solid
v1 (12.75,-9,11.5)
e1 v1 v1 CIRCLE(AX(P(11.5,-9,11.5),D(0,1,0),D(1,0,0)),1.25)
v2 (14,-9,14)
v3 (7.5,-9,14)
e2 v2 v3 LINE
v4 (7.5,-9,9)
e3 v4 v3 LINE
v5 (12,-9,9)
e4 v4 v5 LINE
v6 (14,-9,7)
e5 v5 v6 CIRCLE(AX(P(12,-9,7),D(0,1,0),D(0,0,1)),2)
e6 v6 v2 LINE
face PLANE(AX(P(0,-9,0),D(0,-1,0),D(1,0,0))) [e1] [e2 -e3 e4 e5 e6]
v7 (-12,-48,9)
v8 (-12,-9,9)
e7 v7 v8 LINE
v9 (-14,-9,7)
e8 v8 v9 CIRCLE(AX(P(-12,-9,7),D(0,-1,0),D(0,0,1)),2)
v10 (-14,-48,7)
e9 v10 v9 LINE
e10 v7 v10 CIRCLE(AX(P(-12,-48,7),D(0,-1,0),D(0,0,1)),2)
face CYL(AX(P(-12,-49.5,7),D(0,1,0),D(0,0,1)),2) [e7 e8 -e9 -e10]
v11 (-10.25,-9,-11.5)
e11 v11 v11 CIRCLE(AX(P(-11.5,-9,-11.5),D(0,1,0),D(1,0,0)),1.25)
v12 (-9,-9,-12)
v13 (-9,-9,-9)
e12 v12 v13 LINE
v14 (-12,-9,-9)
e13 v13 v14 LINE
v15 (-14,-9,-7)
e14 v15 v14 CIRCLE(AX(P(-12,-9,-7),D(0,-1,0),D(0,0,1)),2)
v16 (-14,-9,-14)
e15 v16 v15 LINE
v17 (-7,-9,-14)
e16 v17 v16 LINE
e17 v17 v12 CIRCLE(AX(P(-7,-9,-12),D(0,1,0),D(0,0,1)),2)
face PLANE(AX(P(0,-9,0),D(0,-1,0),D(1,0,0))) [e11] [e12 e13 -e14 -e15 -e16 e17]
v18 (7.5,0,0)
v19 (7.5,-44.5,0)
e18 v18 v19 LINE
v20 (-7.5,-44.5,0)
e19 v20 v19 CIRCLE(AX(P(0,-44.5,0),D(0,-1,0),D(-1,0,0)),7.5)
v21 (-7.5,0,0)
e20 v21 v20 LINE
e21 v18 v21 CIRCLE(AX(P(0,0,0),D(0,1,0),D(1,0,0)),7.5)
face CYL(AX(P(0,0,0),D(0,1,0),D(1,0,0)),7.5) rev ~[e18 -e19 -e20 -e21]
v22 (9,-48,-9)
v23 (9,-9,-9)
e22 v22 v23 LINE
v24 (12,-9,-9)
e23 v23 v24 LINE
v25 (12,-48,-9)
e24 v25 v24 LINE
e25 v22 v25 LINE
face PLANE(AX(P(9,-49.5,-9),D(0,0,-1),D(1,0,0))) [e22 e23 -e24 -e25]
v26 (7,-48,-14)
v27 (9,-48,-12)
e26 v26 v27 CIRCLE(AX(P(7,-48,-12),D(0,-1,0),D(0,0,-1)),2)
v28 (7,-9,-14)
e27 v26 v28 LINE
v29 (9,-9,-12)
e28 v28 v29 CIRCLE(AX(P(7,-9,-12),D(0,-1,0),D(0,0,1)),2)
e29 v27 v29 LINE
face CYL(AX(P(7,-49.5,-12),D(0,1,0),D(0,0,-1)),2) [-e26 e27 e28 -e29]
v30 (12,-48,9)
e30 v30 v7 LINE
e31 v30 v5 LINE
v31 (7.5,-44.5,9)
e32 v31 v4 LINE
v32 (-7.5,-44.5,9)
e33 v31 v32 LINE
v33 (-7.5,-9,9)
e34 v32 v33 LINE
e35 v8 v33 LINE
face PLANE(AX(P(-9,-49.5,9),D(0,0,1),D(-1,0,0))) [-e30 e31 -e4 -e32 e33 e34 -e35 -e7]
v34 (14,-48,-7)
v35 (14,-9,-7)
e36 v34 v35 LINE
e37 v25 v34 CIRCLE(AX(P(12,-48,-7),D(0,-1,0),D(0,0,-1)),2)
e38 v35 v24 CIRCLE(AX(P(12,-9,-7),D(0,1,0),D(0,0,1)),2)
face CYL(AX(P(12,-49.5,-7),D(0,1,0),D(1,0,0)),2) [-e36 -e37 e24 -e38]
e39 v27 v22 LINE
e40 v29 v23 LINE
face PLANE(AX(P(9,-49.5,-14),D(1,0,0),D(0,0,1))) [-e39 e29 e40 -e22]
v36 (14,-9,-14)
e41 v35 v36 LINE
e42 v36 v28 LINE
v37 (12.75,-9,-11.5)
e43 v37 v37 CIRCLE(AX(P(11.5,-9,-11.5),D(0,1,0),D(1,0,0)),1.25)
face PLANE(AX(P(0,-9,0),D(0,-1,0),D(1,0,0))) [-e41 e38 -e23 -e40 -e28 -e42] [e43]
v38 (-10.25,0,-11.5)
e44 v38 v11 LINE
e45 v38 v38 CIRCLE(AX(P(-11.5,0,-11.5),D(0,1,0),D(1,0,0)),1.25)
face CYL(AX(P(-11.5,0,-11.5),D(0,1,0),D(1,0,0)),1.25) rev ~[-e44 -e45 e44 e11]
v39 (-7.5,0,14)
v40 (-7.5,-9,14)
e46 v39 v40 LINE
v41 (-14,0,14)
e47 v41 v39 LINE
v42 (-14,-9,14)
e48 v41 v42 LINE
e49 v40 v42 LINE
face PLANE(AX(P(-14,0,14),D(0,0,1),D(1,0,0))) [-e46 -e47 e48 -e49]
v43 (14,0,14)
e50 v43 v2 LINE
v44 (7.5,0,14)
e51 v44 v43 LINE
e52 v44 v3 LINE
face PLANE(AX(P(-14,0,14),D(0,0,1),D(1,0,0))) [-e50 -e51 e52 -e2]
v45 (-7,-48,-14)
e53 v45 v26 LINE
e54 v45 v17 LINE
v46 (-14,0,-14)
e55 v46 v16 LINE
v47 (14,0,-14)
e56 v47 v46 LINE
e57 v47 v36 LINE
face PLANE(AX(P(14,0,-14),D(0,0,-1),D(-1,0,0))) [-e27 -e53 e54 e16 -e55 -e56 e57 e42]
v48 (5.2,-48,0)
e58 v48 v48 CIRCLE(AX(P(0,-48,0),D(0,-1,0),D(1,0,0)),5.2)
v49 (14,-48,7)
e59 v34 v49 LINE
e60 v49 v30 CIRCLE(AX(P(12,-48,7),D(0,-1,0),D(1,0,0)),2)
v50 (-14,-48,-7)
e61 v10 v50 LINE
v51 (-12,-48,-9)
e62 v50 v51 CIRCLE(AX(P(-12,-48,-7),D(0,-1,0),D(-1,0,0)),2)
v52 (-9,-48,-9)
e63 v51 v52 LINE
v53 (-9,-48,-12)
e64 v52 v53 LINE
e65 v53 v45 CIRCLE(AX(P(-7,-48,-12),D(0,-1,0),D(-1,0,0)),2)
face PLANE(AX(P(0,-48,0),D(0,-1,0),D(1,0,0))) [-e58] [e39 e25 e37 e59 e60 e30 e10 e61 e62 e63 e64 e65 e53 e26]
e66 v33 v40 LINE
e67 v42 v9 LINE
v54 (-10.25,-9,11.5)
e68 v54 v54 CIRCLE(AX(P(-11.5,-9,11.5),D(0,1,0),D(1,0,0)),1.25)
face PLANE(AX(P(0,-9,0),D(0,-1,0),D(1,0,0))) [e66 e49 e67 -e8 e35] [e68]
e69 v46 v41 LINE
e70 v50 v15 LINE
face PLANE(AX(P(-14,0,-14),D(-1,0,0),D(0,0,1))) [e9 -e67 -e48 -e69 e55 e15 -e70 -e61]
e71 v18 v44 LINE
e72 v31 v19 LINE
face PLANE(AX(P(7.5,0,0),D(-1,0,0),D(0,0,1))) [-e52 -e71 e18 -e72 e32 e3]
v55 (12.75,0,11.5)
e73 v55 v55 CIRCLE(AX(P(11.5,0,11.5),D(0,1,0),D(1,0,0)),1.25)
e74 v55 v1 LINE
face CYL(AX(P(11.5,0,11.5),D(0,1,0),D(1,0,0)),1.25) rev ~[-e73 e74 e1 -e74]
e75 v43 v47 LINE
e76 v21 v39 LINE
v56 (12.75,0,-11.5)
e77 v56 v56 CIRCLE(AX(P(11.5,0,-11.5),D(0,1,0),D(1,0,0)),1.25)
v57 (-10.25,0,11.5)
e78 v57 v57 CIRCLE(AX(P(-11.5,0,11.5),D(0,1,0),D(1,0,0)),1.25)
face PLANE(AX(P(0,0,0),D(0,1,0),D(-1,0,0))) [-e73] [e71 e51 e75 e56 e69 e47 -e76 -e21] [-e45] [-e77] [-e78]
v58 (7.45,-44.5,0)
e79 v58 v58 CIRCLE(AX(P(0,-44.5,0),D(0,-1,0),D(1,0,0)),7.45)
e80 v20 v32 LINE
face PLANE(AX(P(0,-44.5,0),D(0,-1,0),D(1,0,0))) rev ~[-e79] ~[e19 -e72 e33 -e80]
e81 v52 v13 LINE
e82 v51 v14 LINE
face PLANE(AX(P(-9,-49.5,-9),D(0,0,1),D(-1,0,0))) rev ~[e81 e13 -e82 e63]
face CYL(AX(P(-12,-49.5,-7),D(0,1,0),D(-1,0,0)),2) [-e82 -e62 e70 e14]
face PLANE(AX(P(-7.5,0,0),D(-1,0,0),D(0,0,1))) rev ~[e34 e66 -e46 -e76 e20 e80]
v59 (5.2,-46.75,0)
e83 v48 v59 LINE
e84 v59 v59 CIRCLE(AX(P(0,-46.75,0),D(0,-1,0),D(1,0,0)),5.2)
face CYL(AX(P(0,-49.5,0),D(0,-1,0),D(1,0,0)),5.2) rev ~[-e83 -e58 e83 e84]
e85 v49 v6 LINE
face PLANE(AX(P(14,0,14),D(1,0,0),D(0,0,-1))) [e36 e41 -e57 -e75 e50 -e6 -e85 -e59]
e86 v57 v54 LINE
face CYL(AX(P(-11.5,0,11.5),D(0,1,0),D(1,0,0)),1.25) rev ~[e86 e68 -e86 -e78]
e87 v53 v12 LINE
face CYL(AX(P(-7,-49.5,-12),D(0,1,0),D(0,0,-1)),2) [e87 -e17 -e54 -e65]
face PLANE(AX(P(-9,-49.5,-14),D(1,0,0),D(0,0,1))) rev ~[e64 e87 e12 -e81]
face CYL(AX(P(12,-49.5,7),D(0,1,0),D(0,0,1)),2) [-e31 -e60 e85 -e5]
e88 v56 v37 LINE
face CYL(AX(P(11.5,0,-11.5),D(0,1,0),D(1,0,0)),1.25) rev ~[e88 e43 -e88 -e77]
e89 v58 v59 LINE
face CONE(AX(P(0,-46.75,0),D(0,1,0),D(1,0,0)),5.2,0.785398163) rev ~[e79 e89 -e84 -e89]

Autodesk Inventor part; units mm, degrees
ref_plane "YZ Plane" through (0, 0, 0) normal (1, 0, 0) x (0, 1, 0)
ref_plane "XZ Plane" through (0, 0, 0) normal (0, 1, 0) x (-1, 0, 0)
ref_plane "XY Plane" through (0, 0, 0) normal (0, 0, 1) x (1, 0, 0)
sketch "Skizze1" plane through (0, 0, 0) normal (0, 1, 0) x (-1, 0, 0)
  arc A0 (-7.5, 0) -> (7.5, 0) centre (0, 0) ccw
  line L0 (-14, 14) -> (-14, -14)
  line L1 (-14, -14) -> (14, -14)
  line L2 (14, -14) -> (14, 14)
  line L3 (7.5, 0) -> (7.5, 14)
  line L4 (-7.5, 0) -> (-7.5, 14)
  line L5 (14, 14) -> (7.5, 14)
  line L6 (-7.5, 14) -> (-14, 14)
  dimension "d0" = 15
  dimension "d1" = 28
  dimension "d2" = 28
  dimension "d3" = 14
  dimension "d4" = 14
extrude "Extrusion1" add sketch "Skizze1" against normal blind 49.5
sketch "Skizze2" plane through (0, -49.5, 0) normal (0, -1, 0) x (1, 0, 0)
  line L0 (-14, 14) -> (-14, -14) projected
  line L1 (-14, -14) -> (14, -14) projected
  line L2 (14, -14) -> (14, 14) projected
  line L3 (14, 14) -> (7.5, 14) projected
  line L4 (7.5, 14) -> (7.5, 0) projected
  arc A0 (-7.5, 0) -> (7.5, 0) centre (0, 0) ccw projected
  line L5 (-7.5, 0) -> (-7.5, 14) projected
  line L6 (-7.5, 14) -> (-14, 14) projected
  line L7 (-7.5, 0) -> (-7.5, 14) projected
  line L8 (-7.5, 14) -> (7.5, 14)
  circle A1 centre (0, 0) radius 5.2
  dimension "d7" = 10.4
extrude "Extrusion2" add sketch "Skizze2" against normal blind 5 contours L8 L4 A0 L5
chamfer "Fase1" distance 2.25 angle 45 1 edges at (-5.2, -44.5, 0)
sketch "Skizze5" plane through (0, 0, 0) normal (0, 1, 0) x (1, 0, 0)
  circle A0 centre (-11.5, -11.5) radius 1.25
  line L0 (-14, -14) -> (-14, 14) projected
  line L1 (-7.5, -14) -> (-14, -14) projected
  line L2 (-7.5, 0) -> (-7.5, -14) projected
  arc A1 (7.5, 0) -> (-7.5, 0) centre (0, 0) ccw projected
  line L3 (7.5, -14) -> (7.5, 0) projected
  line L4 (14, -14) -> (7.5, -14) projected
  line L5 (14, 14) -> (14, -14) projected
  line L6 (-14, 14) -> (14, 14) projected
  circle A2 centre (11.5, -11.5) radius 1.25
  circle A3 centre (-11.5, 11.5) radius 1.25
  circle A4 centre (11.5, 11.5) radius 1.25
  dimension "d21" = 2.5
  dimension "d22" = 2.5
  dimension "d23" = 2.5
  dimension "d26" = 23
  dimension "d29" = 23
extrude "Extrusion5" cut sketch "Skizze5" against normal blind 50 contours A0 | A2 | A3 | A4
sketch "Skizze7" plane through (0, -49.5, 0) normal (0, -1, 0) x (1, 0, 0)
  circle A0 centre (-11.5, 11.5) radius 1.25 projected
  circle A1 centre (0, 0) radius 5.2 projected
  line L0 (-14, 14) -> (-14, -14) projected
  line L1 (-14, -14) -> (14, -14) projected
  line L2 (14, -14) -> (14, 14) projected
  line L3 (14, 14) -> (-14, 14) projected
  circle A2 centre (11.5, 11.5) radius 1.25 projected
  circle A3 centre (11.5, -11.5) radius 1.25 projected
  circle A4 centre (-11.5, -11.5) radius 1.25 projected
  line L4 (14, -14) -> (14, 14) projected
  line L5 (14, 14) -> (9, 14)
  line L6 (9, 14) -> (9, 9)
  line L7 (9, 9) -> (14, 9)
  line L8 (14, 9) -> (14, 14)
  line L9 (-14, 14) -> (-9, 14)
  line L10 (-9, 14) -> (-9, 9)
  line L11 (-9, 9) -> (-14, 9)
  line L12 (-14, 9) -> (-14, 14)
  line L13 (-14, -14) -> (-9, -14)
  line L14 (-9, -14) -> (-9, -9)
  line L15 (-9, -9) -> (-14, -9)
  line L16 (-14, -9) -> (-14, -14)
  line L17 (14, -14) -> (9, -14)
  line L18 (9, -14) -> (9, -9)
  line L19 (9, -9) -> (14, -9)
  line L20 (14, -9) -> (14, -14)
  line L21 (9, 9) -> (-9, 9)
  line L22 (-9, 9) -> (-9, 14)
  line L23 (-9, 14) -> (9, 14)
  line L24 (9, 14) -> (9, 9)
  dimension "d45" = 5
  dimension "d46" = 5
  dimension "d47" = 5
  dimension "d48" = 5
  dimension "d49" = 5
  dimension "d50" = 5
extrude "Extrusion7" cut sketch "Skizze7" against normal blind 40.5 contours A0 | L3 L10 L11 L0 | L3 L6 L21 L10 | L15 L14 L1 L0 | L3 L2 L7 L6 | L18 L19 L2 L1 | A2 | A3 | A4
fillet "Rundung3" radius 2 6 edges at (14, -29.25, 9) (14, -29.25, -9) (-14, -29.25, 9) (9, -29.25, -14) (-9, -29.25, -14) (-14, -29.25, -9)
sketch "Skizze8" plane through (0, -49.5, 0) normal (0, -1, 0) x (1, 0, 0)
  circle A0 centre (0, 0) radius 5.2 projected
  arc A1 (-14, -7) -> (-12, -9) centre (-12, -7) ccw projected
  line L0 (-12, -9) -> (-9, -9) projected
  line L1 (-9, -9) -> (-9, -12) projected
  arc A2 (-9, -12) -> (-7, -14) centre (-7, -12) ccw projected
  line L2 (-7, -14) -> (7, -14) projected
  arc A3 (7, -14) -> (9, -12) centre (7, -12) ccw projected
  line L3 (9, -12) -> (9, -9) projected
  line L4 (9, -9) -> (12, -9) projected
  arc A4 (12, -9) -> (14, -7) centre (12, -7) ccw projected
  line L5 (14, -7) -> (14, 7) projected
  arc A5 (14, 7) -> (12, 9) centre (12, 7) ccw projected
  line L6 (12, 9) -> (-12, 9) projected
  arc A6 (-12, 9) -> (-14, 7) centre (-12, 7) ccw projected
  line L7 (-14, 7) -> (-14, -7) projected
extrude "Extrusion8" cut sketch "Skizze8" against normal blind 1.5
properties part number "Lower_Unit"
